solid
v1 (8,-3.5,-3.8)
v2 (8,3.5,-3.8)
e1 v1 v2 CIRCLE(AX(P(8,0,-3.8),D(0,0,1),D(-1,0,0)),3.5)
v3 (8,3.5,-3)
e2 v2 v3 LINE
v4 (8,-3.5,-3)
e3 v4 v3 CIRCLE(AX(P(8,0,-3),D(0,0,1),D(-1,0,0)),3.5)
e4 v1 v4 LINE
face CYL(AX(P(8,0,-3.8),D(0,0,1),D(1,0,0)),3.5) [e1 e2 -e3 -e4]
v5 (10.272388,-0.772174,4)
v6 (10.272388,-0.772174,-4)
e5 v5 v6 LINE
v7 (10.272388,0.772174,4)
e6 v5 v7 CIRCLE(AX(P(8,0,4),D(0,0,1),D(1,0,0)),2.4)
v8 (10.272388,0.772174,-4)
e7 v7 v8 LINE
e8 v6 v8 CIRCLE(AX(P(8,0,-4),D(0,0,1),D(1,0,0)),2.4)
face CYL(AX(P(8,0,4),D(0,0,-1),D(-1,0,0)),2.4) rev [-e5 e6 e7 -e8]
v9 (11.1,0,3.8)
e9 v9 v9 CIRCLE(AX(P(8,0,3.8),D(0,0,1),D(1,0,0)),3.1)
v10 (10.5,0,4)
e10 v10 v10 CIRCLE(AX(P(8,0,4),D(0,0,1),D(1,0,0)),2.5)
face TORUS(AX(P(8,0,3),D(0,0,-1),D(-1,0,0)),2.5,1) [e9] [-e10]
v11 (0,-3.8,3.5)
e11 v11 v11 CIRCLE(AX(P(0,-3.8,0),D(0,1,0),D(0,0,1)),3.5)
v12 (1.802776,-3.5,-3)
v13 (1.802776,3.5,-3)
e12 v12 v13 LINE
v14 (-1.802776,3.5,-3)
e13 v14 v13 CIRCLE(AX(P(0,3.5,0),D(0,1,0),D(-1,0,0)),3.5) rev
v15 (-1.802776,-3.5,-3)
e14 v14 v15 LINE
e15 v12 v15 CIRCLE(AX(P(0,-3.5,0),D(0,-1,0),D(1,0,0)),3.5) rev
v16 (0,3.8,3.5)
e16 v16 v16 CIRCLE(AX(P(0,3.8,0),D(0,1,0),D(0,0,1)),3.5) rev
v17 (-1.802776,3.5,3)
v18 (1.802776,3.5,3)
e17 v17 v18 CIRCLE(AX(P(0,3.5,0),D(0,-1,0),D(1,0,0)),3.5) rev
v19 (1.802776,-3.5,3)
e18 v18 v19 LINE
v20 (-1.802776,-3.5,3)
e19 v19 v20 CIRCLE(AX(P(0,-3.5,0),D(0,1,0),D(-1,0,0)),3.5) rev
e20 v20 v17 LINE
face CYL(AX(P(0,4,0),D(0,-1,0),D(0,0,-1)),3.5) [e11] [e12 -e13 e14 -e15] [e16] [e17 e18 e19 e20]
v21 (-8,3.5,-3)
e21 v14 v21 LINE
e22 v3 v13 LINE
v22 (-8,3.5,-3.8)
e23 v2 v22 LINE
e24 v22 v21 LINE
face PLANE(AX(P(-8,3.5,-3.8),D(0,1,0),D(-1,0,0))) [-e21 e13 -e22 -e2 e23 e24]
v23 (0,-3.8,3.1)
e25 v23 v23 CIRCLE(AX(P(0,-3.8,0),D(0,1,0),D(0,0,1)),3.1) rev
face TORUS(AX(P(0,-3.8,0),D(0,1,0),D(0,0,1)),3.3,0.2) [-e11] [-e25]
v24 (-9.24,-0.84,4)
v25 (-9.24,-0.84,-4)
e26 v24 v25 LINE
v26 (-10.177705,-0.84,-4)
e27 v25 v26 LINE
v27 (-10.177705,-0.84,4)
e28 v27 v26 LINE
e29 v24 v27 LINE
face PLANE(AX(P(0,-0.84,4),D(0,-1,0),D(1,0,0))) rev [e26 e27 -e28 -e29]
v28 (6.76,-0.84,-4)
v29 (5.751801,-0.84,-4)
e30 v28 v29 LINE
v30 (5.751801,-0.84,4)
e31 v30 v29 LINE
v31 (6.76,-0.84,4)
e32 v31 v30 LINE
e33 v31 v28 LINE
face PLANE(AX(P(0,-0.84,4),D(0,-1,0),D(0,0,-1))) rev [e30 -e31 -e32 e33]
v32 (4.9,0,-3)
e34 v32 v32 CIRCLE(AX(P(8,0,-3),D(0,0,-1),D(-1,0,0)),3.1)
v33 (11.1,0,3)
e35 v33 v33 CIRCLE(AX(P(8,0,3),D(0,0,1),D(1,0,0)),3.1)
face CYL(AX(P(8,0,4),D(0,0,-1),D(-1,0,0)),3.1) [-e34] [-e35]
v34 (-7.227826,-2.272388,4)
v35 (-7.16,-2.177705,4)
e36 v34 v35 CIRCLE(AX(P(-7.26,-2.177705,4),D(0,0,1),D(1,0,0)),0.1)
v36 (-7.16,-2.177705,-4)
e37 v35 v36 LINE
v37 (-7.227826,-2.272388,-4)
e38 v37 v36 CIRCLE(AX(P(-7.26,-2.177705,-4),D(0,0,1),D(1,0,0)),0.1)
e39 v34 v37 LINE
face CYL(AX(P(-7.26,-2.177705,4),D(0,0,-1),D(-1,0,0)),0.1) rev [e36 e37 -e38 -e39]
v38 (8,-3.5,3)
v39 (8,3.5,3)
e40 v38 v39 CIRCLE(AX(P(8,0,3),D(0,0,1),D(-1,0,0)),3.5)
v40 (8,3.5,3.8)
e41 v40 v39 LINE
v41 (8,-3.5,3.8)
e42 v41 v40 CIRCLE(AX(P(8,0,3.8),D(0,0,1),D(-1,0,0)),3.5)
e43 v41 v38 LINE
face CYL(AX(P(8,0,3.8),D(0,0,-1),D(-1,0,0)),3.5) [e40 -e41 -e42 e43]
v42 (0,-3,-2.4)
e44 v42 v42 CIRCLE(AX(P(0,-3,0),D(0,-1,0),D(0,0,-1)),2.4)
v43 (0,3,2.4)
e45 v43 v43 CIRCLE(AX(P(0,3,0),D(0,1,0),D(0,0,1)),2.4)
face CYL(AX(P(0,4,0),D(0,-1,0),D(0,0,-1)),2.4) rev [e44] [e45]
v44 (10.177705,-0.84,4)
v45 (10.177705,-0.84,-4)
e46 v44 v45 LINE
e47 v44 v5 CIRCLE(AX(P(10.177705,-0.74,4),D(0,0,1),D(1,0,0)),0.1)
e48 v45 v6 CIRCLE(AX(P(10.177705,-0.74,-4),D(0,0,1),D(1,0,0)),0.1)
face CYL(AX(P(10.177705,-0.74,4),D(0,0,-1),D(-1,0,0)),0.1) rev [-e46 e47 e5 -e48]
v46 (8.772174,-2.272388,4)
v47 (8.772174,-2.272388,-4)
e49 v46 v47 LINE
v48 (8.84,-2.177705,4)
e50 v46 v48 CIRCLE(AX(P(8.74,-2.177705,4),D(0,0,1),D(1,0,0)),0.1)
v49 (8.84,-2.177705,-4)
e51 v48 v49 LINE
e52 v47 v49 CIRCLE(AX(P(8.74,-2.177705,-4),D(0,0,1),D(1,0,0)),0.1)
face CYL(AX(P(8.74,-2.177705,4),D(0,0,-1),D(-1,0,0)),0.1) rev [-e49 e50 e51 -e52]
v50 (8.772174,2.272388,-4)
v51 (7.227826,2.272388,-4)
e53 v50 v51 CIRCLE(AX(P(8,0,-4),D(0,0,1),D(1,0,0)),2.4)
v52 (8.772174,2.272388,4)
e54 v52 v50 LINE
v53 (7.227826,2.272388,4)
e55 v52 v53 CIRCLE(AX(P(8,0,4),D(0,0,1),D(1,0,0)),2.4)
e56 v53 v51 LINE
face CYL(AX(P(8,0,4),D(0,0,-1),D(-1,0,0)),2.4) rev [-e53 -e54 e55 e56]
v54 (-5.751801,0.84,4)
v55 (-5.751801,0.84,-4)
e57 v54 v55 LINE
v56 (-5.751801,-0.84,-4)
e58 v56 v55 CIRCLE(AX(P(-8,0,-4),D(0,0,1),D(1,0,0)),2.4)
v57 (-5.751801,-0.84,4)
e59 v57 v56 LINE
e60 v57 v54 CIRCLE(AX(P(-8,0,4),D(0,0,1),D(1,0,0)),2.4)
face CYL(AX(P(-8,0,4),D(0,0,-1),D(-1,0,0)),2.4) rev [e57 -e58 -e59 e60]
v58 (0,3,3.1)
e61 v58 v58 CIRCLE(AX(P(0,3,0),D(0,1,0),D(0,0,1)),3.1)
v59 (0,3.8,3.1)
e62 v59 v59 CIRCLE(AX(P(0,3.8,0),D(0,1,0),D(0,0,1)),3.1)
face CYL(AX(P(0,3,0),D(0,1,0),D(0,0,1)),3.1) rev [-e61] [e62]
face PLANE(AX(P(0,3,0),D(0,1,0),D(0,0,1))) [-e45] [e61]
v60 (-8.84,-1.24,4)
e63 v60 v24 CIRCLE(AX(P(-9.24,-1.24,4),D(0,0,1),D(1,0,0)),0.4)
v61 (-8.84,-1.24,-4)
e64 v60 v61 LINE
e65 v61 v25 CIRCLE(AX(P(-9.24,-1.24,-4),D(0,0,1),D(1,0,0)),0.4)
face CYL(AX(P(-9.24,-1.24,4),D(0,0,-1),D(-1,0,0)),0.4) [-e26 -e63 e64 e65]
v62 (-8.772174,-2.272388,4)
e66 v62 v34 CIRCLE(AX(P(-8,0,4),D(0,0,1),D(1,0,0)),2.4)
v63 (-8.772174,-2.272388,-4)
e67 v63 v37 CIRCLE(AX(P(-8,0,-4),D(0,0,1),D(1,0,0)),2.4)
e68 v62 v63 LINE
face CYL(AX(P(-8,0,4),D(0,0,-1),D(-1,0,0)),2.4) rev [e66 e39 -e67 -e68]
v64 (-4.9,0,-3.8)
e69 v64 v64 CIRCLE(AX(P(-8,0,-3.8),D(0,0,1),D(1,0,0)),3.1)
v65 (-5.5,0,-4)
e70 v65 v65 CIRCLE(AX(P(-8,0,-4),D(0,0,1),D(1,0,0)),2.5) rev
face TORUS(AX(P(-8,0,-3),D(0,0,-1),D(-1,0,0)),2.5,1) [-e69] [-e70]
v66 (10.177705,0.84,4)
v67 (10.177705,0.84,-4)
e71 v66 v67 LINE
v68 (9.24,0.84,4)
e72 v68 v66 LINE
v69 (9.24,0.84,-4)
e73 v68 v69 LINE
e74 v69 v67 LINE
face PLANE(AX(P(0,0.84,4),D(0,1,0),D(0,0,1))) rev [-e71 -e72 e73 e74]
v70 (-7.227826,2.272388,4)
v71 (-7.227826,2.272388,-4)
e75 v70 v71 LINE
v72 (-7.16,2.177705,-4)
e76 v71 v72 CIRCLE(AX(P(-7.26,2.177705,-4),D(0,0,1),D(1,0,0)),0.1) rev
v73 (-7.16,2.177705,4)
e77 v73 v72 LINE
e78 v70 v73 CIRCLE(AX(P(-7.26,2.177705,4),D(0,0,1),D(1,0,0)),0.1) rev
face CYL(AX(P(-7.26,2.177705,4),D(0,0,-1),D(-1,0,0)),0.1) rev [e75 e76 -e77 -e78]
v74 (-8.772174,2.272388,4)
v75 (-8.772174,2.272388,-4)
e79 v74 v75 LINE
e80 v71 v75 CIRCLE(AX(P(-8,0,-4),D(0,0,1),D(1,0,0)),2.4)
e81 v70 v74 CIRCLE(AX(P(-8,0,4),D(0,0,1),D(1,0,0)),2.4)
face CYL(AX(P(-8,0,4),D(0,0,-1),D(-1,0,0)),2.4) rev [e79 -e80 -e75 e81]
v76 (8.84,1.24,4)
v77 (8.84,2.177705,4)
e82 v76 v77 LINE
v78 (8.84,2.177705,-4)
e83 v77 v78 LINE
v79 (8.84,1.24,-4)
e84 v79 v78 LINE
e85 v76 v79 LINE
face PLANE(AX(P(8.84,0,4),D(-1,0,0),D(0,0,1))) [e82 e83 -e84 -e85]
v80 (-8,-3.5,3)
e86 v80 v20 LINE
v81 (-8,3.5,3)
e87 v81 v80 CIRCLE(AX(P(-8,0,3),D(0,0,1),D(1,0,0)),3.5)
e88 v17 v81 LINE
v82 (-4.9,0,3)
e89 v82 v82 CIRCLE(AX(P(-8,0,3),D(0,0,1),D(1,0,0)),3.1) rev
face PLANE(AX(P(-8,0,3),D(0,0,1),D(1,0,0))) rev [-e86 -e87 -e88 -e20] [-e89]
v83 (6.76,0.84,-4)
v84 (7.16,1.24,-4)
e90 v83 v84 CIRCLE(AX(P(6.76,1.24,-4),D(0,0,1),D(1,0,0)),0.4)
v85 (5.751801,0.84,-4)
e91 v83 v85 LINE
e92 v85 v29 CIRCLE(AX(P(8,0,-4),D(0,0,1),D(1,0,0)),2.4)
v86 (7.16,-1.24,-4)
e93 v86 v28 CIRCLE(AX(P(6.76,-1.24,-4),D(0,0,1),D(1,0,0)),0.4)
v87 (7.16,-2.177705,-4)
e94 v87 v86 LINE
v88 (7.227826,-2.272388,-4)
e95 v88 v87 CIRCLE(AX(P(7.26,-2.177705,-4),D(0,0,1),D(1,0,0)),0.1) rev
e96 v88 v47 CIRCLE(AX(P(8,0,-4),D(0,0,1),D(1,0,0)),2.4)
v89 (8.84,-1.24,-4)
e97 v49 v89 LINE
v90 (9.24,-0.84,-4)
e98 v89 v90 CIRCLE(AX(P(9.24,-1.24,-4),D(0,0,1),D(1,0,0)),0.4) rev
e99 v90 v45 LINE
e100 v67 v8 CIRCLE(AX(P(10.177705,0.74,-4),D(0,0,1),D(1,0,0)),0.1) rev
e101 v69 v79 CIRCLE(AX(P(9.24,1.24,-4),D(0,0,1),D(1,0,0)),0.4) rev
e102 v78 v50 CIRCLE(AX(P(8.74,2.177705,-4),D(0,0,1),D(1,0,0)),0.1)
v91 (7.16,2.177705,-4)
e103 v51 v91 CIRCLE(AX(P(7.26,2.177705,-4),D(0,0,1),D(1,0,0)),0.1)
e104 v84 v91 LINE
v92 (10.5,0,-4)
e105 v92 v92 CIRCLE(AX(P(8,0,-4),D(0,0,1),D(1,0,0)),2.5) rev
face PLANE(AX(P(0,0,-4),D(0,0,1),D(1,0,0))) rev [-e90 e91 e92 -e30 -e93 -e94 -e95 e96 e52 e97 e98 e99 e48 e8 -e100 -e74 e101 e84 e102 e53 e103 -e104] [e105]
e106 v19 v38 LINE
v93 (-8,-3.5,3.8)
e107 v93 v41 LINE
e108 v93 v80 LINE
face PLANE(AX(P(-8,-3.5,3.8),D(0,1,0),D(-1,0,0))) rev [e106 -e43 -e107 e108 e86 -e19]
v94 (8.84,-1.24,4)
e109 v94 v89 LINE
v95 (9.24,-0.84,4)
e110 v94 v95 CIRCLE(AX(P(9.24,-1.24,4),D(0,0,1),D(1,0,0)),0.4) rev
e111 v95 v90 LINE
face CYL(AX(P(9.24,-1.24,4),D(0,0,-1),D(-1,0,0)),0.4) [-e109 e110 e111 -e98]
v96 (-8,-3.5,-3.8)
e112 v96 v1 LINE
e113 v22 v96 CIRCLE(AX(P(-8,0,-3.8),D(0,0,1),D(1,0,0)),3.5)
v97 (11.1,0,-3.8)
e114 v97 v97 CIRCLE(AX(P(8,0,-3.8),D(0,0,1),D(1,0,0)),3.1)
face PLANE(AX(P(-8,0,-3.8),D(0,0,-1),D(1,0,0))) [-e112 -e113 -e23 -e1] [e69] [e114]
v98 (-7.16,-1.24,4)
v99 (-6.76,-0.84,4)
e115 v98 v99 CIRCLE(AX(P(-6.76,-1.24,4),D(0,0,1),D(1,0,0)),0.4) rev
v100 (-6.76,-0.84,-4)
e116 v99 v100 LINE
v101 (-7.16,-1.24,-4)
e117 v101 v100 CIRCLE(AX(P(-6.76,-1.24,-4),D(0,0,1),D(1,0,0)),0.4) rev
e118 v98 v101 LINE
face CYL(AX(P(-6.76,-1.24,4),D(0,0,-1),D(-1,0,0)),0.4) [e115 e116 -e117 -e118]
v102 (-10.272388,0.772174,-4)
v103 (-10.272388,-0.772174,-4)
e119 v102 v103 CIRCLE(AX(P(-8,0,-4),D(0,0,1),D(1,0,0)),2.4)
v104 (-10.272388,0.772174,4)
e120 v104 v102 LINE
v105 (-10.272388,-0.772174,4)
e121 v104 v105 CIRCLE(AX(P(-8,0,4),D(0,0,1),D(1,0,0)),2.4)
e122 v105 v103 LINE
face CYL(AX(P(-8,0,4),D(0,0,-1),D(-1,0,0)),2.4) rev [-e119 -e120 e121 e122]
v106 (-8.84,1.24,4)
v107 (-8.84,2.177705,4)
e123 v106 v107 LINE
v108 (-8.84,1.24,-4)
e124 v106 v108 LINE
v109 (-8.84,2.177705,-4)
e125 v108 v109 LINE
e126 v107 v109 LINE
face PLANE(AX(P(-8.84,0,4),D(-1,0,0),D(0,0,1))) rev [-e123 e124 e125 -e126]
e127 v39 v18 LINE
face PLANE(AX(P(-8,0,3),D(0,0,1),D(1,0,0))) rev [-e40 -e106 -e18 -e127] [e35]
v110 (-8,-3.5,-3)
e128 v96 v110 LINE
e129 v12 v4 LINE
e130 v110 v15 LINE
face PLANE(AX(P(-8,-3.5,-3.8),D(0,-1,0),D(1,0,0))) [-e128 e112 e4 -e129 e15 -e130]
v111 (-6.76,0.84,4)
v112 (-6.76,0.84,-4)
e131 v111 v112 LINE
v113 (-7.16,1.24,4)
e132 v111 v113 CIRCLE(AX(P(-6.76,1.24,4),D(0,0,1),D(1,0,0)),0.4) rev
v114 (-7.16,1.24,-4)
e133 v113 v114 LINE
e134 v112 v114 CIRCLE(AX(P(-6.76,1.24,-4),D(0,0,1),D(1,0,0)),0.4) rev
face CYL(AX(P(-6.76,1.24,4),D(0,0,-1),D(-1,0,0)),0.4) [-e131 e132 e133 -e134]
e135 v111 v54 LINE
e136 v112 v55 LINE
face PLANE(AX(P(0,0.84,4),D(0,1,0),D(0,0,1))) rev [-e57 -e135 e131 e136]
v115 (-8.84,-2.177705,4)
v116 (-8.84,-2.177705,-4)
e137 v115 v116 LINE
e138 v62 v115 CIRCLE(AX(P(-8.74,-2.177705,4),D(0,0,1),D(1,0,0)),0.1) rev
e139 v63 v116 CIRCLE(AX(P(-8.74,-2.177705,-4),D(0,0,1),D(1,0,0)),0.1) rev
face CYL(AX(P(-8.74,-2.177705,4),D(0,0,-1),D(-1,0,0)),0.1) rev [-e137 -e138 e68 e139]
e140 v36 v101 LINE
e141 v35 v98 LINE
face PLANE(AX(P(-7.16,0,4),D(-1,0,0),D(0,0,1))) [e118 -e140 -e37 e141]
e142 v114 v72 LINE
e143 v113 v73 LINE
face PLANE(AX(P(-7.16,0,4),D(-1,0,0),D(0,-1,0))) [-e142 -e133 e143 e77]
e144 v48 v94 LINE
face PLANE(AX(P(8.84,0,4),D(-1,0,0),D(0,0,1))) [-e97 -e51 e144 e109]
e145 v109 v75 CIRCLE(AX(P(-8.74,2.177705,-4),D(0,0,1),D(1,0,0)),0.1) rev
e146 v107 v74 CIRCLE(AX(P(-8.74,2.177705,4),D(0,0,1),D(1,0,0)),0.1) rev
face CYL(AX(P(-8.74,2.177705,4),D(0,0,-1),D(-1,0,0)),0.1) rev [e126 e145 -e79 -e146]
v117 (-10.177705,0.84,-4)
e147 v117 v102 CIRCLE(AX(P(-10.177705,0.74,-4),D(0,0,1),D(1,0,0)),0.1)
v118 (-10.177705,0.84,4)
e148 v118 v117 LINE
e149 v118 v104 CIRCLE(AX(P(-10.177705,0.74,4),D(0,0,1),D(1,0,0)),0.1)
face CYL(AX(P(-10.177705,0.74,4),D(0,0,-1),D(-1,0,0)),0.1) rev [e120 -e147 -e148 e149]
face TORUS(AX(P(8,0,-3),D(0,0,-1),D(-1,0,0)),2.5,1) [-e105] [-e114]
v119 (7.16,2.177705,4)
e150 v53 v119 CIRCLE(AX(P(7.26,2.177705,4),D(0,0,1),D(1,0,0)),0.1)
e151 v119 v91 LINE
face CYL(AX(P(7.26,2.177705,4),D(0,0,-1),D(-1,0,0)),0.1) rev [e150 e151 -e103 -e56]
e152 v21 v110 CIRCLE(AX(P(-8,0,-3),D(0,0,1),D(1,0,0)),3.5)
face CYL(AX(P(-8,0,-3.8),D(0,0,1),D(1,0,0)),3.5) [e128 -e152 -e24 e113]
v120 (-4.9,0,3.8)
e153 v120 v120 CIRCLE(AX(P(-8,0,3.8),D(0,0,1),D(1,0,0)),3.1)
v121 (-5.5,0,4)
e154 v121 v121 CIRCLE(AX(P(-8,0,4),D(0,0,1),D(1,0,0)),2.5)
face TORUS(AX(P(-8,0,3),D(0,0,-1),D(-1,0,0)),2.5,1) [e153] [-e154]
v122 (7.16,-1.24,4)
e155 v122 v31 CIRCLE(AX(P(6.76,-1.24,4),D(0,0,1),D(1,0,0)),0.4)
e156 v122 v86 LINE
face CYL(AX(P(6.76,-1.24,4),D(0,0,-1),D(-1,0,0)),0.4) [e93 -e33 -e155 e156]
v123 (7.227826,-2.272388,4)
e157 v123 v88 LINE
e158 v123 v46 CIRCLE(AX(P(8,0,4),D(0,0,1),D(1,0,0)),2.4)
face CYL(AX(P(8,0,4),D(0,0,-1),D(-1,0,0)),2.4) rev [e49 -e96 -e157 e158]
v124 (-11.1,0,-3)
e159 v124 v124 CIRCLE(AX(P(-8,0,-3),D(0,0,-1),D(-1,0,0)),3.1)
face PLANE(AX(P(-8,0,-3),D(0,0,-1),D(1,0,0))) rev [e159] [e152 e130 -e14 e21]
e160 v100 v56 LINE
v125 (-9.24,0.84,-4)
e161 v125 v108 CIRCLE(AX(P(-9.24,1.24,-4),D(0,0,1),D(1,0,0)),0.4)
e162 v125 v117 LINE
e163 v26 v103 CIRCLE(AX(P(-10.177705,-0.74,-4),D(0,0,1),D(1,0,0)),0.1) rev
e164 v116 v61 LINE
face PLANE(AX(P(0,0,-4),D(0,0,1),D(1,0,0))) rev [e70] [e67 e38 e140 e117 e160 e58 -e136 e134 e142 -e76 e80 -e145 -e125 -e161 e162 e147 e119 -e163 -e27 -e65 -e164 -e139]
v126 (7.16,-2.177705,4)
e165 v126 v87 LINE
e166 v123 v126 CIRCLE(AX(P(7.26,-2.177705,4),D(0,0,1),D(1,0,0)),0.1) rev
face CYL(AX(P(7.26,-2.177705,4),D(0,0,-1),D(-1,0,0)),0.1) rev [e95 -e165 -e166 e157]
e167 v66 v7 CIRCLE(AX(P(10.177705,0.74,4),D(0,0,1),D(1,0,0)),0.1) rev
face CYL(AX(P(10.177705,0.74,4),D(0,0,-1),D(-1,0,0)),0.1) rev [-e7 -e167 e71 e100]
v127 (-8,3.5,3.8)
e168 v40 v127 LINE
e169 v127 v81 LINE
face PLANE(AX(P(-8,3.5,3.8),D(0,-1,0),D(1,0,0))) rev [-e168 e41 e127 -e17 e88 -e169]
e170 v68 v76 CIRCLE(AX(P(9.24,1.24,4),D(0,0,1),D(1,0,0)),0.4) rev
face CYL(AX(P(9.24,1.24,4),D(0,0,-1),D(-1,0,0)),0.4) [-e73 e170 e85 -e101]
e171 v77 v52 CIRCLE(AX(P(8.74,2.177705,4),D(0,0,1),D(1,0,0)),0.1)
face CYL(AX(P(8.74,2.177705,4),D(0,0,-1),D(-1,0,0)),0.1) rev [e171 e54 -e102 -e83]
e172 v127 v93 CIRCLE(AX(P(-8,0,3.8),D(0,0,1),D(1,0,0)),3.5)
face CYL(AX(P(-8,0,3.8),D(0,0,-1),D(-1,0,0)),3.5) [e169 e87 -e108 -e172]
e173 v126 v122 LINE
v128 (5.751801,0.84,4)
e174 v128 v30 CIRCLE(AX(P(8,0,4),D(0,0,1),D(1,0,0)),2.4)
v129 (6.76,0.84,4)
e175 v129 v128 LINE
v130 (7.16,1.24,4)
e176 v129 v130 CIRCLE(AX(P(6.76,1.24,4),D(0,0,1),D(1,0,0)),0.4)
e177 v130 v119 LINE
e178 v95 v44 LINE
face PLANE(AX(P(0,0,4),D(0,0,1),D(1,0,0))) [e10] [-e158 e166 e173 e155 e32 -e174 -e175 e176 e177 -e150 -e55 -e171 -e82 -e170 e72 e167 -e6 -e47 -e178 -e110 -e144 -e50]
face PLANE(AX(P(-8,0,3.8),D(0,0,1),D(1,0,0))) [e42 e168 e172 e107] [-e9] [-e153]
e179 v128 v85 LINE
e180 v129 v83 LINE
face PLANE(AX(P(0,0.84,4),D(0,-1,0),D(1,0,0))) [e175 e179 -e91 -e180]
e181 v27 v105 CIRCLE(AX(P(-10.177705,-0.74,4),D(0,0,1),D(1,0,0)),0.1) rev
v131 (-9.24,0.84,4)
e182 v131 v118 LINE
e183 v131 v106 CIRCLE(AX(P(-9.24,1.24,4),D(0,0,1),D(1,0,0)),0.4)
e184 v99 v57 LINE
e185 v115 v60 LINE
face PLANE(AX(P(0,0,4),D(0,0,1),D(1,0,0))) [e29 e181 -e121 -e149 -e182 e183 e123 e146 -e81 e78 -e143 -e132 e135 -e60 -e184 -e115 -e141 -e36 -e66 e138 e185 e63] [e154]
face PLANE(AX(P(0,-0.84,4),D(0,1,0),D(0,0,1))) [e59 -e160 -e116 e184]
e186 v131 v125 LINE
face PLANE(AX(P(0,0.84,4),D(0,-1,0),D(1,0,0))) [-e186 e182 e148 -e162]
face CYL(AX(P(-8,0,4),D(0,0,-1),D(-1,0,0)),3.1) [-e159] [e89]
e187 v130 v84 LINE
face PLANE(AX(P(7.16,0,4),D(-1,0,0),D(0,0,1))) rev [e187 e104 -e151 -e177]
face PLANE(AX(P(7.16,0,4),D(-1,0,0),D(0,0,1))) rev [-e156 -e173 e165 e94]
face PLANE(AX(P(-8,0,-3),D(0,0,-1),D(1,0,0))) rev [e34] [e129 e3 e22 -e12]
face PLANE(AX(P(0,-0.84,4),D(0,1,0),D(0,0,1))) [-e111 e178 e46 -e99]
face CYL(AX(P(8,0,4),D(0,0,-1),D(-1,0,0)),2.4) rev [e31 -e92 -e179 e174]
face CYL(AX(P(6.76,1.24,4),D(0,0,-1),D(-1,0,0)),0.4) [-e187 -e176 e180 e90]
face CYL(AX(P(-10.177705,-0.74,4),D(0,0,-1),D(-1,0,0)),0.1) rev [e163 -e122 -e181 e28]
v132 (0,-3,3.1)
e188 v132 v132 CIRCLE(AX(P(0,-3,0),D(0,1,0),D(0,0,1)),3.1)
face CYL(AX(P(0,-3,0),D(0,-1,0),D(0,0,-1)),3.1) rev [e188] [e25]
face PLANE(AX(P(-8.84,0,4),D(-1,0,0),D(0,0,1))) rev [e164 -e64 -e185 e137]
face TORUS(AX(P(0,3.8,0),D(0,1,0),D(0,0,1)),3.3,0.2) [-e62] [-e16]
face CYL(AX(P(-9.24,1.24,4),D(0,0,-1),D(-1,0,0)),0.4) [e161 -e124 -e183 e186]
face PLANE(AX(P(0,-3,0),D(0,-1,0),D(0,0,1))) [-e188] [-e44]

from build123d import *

# Parameters (mm, degrees)
SKETCH1_R           = 3.1
BOSS_EXTRUDE1_DEPTH = 4
BOSS_EXTRUDE2_START = 0.8
SKETCH2_R           = 3.1
BOSS_EXTRUDE2_DEPTH = 0.8
FILLET2_R           = 1
FILLET3_R           = 1
FILLET7_R           = 1
FILLET8_R           = 1
SKETCH4_R           = 3.5
SKETCH4_R_2         = 2.4
BOSS_EXTRUDE3_DEPTH = 4
SKETCH6_R           = 3.1
CUT_EXTRUDE1_DEPTH  = 1
FILLET10_R          = 0.2
FILLET11_R          = 0.2


# Some blends are built 0.0001 mm under size
with BuildPart() as part:
    # Sketch1 → Boss-Extrude1 (new, symmetric)
    # profile 1 of 10: a face of its own
    with BuildSketch(Plane.XY):
        with Locations((8, 0)):
            Circle(SKETCH1_R)
        with BuildLine():
            ThreePointArc((7.227826087, 2.27238805), (8, 2.4), (8.772173913, 2.27238805))
            ThreePointArc((8.772173913, 2.27238805), (9.697056275, 1.697056275), (10.27238805, 0.772173913))
            ThreePointArc((10.27238805, 0.772173913), (10.367882104, 0.391323831), (10.4, 0))
            ThreePointArc((10.4, 0), (10.367882104, -0.391323831), (10.27238805, -0.772173913))
            ThreePointArc((10.27238805, -0.772173913), (9.697056275, -1.697056275), (8.772173913, -2.27238805))
            ThreePointArc((8.772173913, -2.27238805), (8, -2.4), (7.227826087, -2.27238805))
            ThreePointArc((7.227826087, -2.27238805), (6.328594174, -1.722324755), (5.751800721, -0.84))
            ThreePointArc((5.751800721, -0.84), (5.6, 0), (5.751800721, 0.84))
            ThreePointArc((5.751800721, 0.84), (6.328594174, 1.722324755), (7.227826087, 2.27238805))
        make_face(mode=Mode.SUBTRACT)
    # profile 2 of 10: a face of its own
    with BuildSketch(Plane.XY):
        with BuildLine():
            Line((8.84, 2.177705214), (8.84, 1.24))
            ThreePointArc((8.84, 1.24), (8.957157288, 0.957157288), (9.24, 0.84))
            Line((9.24, 0.84), (10.177705214, 0.84))
            ThreePointArc((10.177705214, 0.84), (10.235940121, 0.821293884), (10.27238805, 0.772173913))
            ThreePointArc((10.27238805, 0.772173913), (9.697056275, 1.697056275), (8.772173913, 2.27238805))
            ThreePointArc((8.772173913, 2.27238805), (8.821293884, 2.235940121), (8.84, 2.177705214))
        make_face()
    # profile 3 of 10: a face of its own
    with BuildSketch(Plane.XY):
        with BuildLine():
            ThreePointArc((7.16, 2.177705214), (7.178706116, 2.235940121), (7.227826087, 2.27238805))
            ThreePointArc((7.227826087, 2.27238805), (6.328594174, 1.722324755), (5.751800721, 0.84))
            Line((5.751800721, 0.84), (6.76, 0.84))
            ThreePointArc((6.76, 0.84), (7.042842712, 0.957157288), (7.16, 1.24))
            Line((7.16, 1.24), (7.16, 2.177705214))
        make_face()
    # profile 4 of 10: a face of its own
    with BuildSketch(Plane.XY):
        with BuildLine():
            ThreePointArc((8.772173913, -2.27238805), (9.697056275, -1.697056275), (10.27238805, -0.772173913))
            ThreePointArc((10.27238805, -0.772173913), (10.235940121, -0.821293884), (10.177705214, -0.84))
            Line((10.177705214, -0.84), (9.24, -0.84))
            ThreePointArc((9.24, -0.84), (8.957157288, -0.957157288), (8.84, -1.24))
            Line((8.84, -1.24), (8.84, -2.177705214))
            ThreePointArc((8.84, -2.177705214), (8.821293884, -2.235940121), (8.772173913, -2.27238805))
        make_face()
    # profile 5 of 10: a face of its own
    with BuildSketch(Plane.XY):
        with BuildLine():
            Line((6.76, -0.84), (5.751800721, -0.84))
            ThreePointArc((5.751800721, -0.84), (6.328594174, -1.722324755), (7.227826087, -2.27238805))
            ThreePointArc((7.227826087, -2.27238805), (7.178706116, -2.235940121), (7.16, -2.177705214))
            Line((7.16, -2.177705214), (7.16, -1.24))
            ThreePointArc((7.16, -1.24), (7.042842712, -0.957157288), (6.76, -0.84))
        make_face()
    # profile 6 of 10: a face of its own
    with BuildSketch(Plane.XY):
        with Locations((-8, 0)):
            Circle(SKETCH1_R)
        with BuildLine():
            ThreePointArc((-10.27238805, -0.772173913), (-10.4, 0), (-10.27238805, 0.772173913))
            ThreePointArc((-10.27238805, 0.772173913), (-9.697056275, 1.697056275), (-8.772173913, 2.27238805))
            ThreePointArc((-8.772173913, 2.27238805), (-8, 2.4), (-7.227826087, 2.27238805))
            ThreePointArc((-7.227826087, 2.27238805), (-6.328594174, 1.722324755), (-5.751800721, 0.84))
            ThreePointArc((-5.751800721, 0.84), (-5.638255066, 0.426803075), (-5.6, 0))
            ThreePointArc((-5.6, 0), (-5.638255066, -0.426803075), (-5.751800721, -0.84))
            ThreePointArc((-5.751800721, -0.84), (-6.328594174, -1.722324755), (-7.227826087, -2.27238805))
            ThreePointArc((-7.227826087, -2.27238805), (-8, -2.4), (-8.772173913, -2.27238805))
            ThreePointArc((-8.772173913, -2.27238805), (-9.697056275, -1.697056275), (-10.27238805, -0.772173913))
        make_face(mode=Mode.SUBTRACT)
    # profile 7 of 10: a face of its own
    with BuildSketch(Plane.XY):
        with BuildLine():
            ThreePointArc((-5.751800721, 0.84), (-6.328594174, 1.722324755), (-7.227826087, 2.27238805))
            ThreePointArc((-7.227826087, 2.27238805), (-7.178706116, 2.235940121), (-7.16, 2.177705214))
            Line((-7.16, 2.177705214), (-7.16, 1.24))
            ThreePointArc((-7.16, 1.24), (-7.042842712, 0.957157288), (-6.76, 0.84))
            Line((-6.76, 0.84), (-5.751800721, 0.84))
        make_face()
    # profile 8 of 10: a face of its own
    with BuildSketch(Plane.XY):
        with BuildLine():
            ThreePointArc((-7.16, -2.177705214), (-7.178706116, -2.235940121), (-7.227826087, -2.27238805))
            ThreePointArc((-7.227826087, -2.27238805), (-6.328594174, -1.722324755), (-5.751800721, -0.84))
            Line((-5.751800721, -0.84), (-6.76, -0.84))
            ThreePointArc((-6.76, -0.84), (-7.042842712, -0.957157288), (-7.16, -1.24))
            Line((-7.16, -1.24), (-7.16, -2.177705214))
        make_face()
    # profile 9 of 10: a face of its own
    with BuildSketch(Plane.XY):
        with BuildLine():
            ThreePointArc((-10.177705214, -0.84), (-10.235940121, -0.821293884), (-10.27238805, -0.772173913))
            ThreePointArc((-10.27238805, -0.772173913), (-9.697056275, -1.697056275), (-8.772173913, -2.27238805))
            ThreePointArc((-8.772173913, -2.27238805), (-8.821293884, -2.235940121), (-8.84, -2.177705214))
            Line((-8.84, -2.177705214), (-8.84, -1.24))
            ThreePointArc((-8.84, -1.24), (-8.957157288, -0.957157288), (-9.24, -0.84))
            Line((-9.24, -0.84), (-10.177705214, -0.84))
        make_face()
    # profile 10 of 10: a face of its own
    with BuildSketch(Plane.XY):
        with BuildLine():
            Line((-10.177705214, 0.84), (-9.24, 0.84))
            ThreePointArc((-9.24, 0.84), (-8.957157288, 0.957157288), (-8.84, 1.24))
            Line((-8.84, 1.24), (-8.84, 2.177705214))
            ThreePointArc((-8.84, 2.177705214), (-8.821293884, 2.235940121), (-8.772173913, 2.27238805))
            ThreePointArc((-8.772173913, 2.27238805), (-9.697056275, 1.697056275), (-10.27238805, 0.772173913))
            ThreePointArc((-10.27238805, 0.772173913), (-10.235940121, 0.821293884), (-10.177705214, 0.84))
        make_face()
    extrude(amount=BOSS_EXTRUDE1_DEPTH, both=True)

    # Sketch2 → Boss-Extrude2 (add)
    with BuildSketch(Plane.XY.offset(3).offset(BOSS_EXTRUDE2_START)):
        with BuildLine():
            Line((-8, 3.5), (8, 3.5))
            ThreePointArc((8, 3.5), (11.5, 0), (8, -3.5))
            Line((8, -3.5), (-8, -3.5))
            ThreePointArc((-8, -3.5), (-11.5, 0), (-8, 3.5))
        make_face()
        with Locations((-8, 0)):
            Circle(SKETCH2_R, mode=Mode.SUBTRACT)
        with Locations((8, 0)):
            Circle(SKETCH2_R, mode=Mode.SUBTRACT)
    boss_extrude2 = extrude(amount=-BOSS_EXTRUDE2_DEPTH)

    # Fillet2
    # the kernel refuses this fillet: 1 mm, written as the material it takes off along each edge
    with BuildSketch(Plane(origin=(-8, 0, 4), x_dir=(1, 0, 0), z_dir=(0, -1, 0))) as fillet2_piece_1:
        with BuildLine():
            CenterArc((2.5, -1), FILLET2_R, 53.130102354, 36.869897646)
            Line((3.1, -0.2), (3.1, 0))
            Line((3.1, 0), (2.5, 0))
        make_face()
    revolve(axis=Axis((-8, 0, 4), (0, 0, 1)), mode=Mode.SUBTRACT)

    # Fillet3
    # the kernel refuses this fillet: 1 mm, written as the material it takes off along each edge
    with BuildSketch(Plane(origin=(8, 0, 4), x_dir=(1, 0, 0), z_dir=(0, -1, 0))) as fillet3_piece_1:
        with BuildLine():
            CenterArc((2.5, -1), FILLET3_R, 53.130102354, 36.869897646)
            Line((2.5, 0), (2.5, 0.02))
            Line((2.5, 0.02), (3.1, 0.02))
            Line((3.1, 0.02), (3.12, 0))
            ThreePointArc((3.12, 0), (3.12, -0.1), (3.112, -0.184))
            Line((3.112, -0.184), (3.1, -0.2))
        make_face()
    revolve(axis=Axis((8, 0, 4), (0, 0, 1)), mode=Mode.SUBTRACT)

    # Mirror2: Boss-Extrude2 across plane
    add(boss_extrude2.mirror(Plane.XY))

    # Fillet7
    # the kernel refuses this fillet: 1 mm, written as the material it takes off along each edge
    with BuildSketch(Plane(origin=(8, 0, -4), x_dir=(1, 0, 0), z_dir=(0, -1, 0))) as fillet7_piece_1:
        with BuildLine():
            CenterArc((2.5, 1), FILLET7_R, 270, 36.869897646)
            Line((2.5, 0), (2.5, -0.02))
            Line((2.5, -0.02), (3.1, -0.02))
            Line((3.1, -0.02), (3.12, 0))
            ThreePointArc((3.12, 0), (3.12, 0.1), (3.112, 0.184))
            Line((3.112, 0.184), (3.1, 0.2))
        make_face()
    revolve(axis=Axis((8, 0, -4), (0, 0, 1)), mode=Mode.SUBTRACT)

    # Fillet8
    # the kernel refuses this fillet: 1 mm, written as the material it takes off along each edge
    with BuildSketch(Plane(origin=(-8, 0, -4), x_dir=(1, 0, 0), z_dir=(0, -1, 0))) as fillet8_piece_1:
        with BuildLine():
            CenterArc((2.5, 1), FILLET8_R, 270, 36.869897646)
            Line((2.5, 0), (2.5, -0.02))
            Line((2.5, -0.02), (3.1, -0.02))
            Line((3.1, -0.02), (3.12, 0))
            ThreePointArc((3.12, 0), (3.12, 0.1), (3.112, 0.184))
            Line((3.112, 0.184), (3.1, 0.2))
        make_face()
    revolve(axis=Axis((-8, 0, -4), (0, 0, 1)), mode=Mode.SUBTRACT)

    # Sketch4 → Boss-Extrude3 (add, symmetric)
    with BuildSketch(Plane(origin=(0, 0, 0), x_dir=(1, 0, 0), z_dir=(0, 1, 0))):
        with Locations(Location((0, 0, 0), (0, 0, 270))):
            Circle(SKETCH4_R)
        with Locations(Location((0, 0, 0), (0, 0, 270))):
            Circle(SKETCH4_R_2, mode=Mode.SUBTRACT)
    extrude(amount=BOSS_EXTRUDE3_DEPTH, both=True)

    # Sketch6 → Cut-Extrude1 (cut)
    with BuildSketch(Plane(origin=(0, 4, 0), x_dir=(1, 0, 0), z_dir=(0, 1, 0))):
        with Locations(Location((0, 0, 0), (0, 0, 270))):
            Circle(SKETCH6_R)
    cut_extrude1 = extrude(amount=-CUT_EXTRUDE1_DEPTH, mode=Mode.SUBTRACT)

    # Mirror5: Cut-Extrude1 across plane
    add(cut_extrude1.mirror(Plane.ZX), mode=Mode.SUBTRACT)

    # Fillet10
    fillet10_edges = [part.edges().sort_by_distance(p)[0] for p in [
        (0, 4, -3.5),
        (0, 4, -3.1),
    ]]
    fillet(fillet10_edges, radius=FILLET10_R - 0.0001)  # a hair under: the kernel refuses the full size

    # Fillet11
    fillet11_edges = [part.edges().sort_by_distance(p)[0] for p in [
        (0, -4, -3.5),
        (0, -4, -3.1),
    ]]
    fillet(fillet11_edges, radius=FILLET11_R - 0.0001)  # a hair under: the kernel refuses the full size


solid = part.part
